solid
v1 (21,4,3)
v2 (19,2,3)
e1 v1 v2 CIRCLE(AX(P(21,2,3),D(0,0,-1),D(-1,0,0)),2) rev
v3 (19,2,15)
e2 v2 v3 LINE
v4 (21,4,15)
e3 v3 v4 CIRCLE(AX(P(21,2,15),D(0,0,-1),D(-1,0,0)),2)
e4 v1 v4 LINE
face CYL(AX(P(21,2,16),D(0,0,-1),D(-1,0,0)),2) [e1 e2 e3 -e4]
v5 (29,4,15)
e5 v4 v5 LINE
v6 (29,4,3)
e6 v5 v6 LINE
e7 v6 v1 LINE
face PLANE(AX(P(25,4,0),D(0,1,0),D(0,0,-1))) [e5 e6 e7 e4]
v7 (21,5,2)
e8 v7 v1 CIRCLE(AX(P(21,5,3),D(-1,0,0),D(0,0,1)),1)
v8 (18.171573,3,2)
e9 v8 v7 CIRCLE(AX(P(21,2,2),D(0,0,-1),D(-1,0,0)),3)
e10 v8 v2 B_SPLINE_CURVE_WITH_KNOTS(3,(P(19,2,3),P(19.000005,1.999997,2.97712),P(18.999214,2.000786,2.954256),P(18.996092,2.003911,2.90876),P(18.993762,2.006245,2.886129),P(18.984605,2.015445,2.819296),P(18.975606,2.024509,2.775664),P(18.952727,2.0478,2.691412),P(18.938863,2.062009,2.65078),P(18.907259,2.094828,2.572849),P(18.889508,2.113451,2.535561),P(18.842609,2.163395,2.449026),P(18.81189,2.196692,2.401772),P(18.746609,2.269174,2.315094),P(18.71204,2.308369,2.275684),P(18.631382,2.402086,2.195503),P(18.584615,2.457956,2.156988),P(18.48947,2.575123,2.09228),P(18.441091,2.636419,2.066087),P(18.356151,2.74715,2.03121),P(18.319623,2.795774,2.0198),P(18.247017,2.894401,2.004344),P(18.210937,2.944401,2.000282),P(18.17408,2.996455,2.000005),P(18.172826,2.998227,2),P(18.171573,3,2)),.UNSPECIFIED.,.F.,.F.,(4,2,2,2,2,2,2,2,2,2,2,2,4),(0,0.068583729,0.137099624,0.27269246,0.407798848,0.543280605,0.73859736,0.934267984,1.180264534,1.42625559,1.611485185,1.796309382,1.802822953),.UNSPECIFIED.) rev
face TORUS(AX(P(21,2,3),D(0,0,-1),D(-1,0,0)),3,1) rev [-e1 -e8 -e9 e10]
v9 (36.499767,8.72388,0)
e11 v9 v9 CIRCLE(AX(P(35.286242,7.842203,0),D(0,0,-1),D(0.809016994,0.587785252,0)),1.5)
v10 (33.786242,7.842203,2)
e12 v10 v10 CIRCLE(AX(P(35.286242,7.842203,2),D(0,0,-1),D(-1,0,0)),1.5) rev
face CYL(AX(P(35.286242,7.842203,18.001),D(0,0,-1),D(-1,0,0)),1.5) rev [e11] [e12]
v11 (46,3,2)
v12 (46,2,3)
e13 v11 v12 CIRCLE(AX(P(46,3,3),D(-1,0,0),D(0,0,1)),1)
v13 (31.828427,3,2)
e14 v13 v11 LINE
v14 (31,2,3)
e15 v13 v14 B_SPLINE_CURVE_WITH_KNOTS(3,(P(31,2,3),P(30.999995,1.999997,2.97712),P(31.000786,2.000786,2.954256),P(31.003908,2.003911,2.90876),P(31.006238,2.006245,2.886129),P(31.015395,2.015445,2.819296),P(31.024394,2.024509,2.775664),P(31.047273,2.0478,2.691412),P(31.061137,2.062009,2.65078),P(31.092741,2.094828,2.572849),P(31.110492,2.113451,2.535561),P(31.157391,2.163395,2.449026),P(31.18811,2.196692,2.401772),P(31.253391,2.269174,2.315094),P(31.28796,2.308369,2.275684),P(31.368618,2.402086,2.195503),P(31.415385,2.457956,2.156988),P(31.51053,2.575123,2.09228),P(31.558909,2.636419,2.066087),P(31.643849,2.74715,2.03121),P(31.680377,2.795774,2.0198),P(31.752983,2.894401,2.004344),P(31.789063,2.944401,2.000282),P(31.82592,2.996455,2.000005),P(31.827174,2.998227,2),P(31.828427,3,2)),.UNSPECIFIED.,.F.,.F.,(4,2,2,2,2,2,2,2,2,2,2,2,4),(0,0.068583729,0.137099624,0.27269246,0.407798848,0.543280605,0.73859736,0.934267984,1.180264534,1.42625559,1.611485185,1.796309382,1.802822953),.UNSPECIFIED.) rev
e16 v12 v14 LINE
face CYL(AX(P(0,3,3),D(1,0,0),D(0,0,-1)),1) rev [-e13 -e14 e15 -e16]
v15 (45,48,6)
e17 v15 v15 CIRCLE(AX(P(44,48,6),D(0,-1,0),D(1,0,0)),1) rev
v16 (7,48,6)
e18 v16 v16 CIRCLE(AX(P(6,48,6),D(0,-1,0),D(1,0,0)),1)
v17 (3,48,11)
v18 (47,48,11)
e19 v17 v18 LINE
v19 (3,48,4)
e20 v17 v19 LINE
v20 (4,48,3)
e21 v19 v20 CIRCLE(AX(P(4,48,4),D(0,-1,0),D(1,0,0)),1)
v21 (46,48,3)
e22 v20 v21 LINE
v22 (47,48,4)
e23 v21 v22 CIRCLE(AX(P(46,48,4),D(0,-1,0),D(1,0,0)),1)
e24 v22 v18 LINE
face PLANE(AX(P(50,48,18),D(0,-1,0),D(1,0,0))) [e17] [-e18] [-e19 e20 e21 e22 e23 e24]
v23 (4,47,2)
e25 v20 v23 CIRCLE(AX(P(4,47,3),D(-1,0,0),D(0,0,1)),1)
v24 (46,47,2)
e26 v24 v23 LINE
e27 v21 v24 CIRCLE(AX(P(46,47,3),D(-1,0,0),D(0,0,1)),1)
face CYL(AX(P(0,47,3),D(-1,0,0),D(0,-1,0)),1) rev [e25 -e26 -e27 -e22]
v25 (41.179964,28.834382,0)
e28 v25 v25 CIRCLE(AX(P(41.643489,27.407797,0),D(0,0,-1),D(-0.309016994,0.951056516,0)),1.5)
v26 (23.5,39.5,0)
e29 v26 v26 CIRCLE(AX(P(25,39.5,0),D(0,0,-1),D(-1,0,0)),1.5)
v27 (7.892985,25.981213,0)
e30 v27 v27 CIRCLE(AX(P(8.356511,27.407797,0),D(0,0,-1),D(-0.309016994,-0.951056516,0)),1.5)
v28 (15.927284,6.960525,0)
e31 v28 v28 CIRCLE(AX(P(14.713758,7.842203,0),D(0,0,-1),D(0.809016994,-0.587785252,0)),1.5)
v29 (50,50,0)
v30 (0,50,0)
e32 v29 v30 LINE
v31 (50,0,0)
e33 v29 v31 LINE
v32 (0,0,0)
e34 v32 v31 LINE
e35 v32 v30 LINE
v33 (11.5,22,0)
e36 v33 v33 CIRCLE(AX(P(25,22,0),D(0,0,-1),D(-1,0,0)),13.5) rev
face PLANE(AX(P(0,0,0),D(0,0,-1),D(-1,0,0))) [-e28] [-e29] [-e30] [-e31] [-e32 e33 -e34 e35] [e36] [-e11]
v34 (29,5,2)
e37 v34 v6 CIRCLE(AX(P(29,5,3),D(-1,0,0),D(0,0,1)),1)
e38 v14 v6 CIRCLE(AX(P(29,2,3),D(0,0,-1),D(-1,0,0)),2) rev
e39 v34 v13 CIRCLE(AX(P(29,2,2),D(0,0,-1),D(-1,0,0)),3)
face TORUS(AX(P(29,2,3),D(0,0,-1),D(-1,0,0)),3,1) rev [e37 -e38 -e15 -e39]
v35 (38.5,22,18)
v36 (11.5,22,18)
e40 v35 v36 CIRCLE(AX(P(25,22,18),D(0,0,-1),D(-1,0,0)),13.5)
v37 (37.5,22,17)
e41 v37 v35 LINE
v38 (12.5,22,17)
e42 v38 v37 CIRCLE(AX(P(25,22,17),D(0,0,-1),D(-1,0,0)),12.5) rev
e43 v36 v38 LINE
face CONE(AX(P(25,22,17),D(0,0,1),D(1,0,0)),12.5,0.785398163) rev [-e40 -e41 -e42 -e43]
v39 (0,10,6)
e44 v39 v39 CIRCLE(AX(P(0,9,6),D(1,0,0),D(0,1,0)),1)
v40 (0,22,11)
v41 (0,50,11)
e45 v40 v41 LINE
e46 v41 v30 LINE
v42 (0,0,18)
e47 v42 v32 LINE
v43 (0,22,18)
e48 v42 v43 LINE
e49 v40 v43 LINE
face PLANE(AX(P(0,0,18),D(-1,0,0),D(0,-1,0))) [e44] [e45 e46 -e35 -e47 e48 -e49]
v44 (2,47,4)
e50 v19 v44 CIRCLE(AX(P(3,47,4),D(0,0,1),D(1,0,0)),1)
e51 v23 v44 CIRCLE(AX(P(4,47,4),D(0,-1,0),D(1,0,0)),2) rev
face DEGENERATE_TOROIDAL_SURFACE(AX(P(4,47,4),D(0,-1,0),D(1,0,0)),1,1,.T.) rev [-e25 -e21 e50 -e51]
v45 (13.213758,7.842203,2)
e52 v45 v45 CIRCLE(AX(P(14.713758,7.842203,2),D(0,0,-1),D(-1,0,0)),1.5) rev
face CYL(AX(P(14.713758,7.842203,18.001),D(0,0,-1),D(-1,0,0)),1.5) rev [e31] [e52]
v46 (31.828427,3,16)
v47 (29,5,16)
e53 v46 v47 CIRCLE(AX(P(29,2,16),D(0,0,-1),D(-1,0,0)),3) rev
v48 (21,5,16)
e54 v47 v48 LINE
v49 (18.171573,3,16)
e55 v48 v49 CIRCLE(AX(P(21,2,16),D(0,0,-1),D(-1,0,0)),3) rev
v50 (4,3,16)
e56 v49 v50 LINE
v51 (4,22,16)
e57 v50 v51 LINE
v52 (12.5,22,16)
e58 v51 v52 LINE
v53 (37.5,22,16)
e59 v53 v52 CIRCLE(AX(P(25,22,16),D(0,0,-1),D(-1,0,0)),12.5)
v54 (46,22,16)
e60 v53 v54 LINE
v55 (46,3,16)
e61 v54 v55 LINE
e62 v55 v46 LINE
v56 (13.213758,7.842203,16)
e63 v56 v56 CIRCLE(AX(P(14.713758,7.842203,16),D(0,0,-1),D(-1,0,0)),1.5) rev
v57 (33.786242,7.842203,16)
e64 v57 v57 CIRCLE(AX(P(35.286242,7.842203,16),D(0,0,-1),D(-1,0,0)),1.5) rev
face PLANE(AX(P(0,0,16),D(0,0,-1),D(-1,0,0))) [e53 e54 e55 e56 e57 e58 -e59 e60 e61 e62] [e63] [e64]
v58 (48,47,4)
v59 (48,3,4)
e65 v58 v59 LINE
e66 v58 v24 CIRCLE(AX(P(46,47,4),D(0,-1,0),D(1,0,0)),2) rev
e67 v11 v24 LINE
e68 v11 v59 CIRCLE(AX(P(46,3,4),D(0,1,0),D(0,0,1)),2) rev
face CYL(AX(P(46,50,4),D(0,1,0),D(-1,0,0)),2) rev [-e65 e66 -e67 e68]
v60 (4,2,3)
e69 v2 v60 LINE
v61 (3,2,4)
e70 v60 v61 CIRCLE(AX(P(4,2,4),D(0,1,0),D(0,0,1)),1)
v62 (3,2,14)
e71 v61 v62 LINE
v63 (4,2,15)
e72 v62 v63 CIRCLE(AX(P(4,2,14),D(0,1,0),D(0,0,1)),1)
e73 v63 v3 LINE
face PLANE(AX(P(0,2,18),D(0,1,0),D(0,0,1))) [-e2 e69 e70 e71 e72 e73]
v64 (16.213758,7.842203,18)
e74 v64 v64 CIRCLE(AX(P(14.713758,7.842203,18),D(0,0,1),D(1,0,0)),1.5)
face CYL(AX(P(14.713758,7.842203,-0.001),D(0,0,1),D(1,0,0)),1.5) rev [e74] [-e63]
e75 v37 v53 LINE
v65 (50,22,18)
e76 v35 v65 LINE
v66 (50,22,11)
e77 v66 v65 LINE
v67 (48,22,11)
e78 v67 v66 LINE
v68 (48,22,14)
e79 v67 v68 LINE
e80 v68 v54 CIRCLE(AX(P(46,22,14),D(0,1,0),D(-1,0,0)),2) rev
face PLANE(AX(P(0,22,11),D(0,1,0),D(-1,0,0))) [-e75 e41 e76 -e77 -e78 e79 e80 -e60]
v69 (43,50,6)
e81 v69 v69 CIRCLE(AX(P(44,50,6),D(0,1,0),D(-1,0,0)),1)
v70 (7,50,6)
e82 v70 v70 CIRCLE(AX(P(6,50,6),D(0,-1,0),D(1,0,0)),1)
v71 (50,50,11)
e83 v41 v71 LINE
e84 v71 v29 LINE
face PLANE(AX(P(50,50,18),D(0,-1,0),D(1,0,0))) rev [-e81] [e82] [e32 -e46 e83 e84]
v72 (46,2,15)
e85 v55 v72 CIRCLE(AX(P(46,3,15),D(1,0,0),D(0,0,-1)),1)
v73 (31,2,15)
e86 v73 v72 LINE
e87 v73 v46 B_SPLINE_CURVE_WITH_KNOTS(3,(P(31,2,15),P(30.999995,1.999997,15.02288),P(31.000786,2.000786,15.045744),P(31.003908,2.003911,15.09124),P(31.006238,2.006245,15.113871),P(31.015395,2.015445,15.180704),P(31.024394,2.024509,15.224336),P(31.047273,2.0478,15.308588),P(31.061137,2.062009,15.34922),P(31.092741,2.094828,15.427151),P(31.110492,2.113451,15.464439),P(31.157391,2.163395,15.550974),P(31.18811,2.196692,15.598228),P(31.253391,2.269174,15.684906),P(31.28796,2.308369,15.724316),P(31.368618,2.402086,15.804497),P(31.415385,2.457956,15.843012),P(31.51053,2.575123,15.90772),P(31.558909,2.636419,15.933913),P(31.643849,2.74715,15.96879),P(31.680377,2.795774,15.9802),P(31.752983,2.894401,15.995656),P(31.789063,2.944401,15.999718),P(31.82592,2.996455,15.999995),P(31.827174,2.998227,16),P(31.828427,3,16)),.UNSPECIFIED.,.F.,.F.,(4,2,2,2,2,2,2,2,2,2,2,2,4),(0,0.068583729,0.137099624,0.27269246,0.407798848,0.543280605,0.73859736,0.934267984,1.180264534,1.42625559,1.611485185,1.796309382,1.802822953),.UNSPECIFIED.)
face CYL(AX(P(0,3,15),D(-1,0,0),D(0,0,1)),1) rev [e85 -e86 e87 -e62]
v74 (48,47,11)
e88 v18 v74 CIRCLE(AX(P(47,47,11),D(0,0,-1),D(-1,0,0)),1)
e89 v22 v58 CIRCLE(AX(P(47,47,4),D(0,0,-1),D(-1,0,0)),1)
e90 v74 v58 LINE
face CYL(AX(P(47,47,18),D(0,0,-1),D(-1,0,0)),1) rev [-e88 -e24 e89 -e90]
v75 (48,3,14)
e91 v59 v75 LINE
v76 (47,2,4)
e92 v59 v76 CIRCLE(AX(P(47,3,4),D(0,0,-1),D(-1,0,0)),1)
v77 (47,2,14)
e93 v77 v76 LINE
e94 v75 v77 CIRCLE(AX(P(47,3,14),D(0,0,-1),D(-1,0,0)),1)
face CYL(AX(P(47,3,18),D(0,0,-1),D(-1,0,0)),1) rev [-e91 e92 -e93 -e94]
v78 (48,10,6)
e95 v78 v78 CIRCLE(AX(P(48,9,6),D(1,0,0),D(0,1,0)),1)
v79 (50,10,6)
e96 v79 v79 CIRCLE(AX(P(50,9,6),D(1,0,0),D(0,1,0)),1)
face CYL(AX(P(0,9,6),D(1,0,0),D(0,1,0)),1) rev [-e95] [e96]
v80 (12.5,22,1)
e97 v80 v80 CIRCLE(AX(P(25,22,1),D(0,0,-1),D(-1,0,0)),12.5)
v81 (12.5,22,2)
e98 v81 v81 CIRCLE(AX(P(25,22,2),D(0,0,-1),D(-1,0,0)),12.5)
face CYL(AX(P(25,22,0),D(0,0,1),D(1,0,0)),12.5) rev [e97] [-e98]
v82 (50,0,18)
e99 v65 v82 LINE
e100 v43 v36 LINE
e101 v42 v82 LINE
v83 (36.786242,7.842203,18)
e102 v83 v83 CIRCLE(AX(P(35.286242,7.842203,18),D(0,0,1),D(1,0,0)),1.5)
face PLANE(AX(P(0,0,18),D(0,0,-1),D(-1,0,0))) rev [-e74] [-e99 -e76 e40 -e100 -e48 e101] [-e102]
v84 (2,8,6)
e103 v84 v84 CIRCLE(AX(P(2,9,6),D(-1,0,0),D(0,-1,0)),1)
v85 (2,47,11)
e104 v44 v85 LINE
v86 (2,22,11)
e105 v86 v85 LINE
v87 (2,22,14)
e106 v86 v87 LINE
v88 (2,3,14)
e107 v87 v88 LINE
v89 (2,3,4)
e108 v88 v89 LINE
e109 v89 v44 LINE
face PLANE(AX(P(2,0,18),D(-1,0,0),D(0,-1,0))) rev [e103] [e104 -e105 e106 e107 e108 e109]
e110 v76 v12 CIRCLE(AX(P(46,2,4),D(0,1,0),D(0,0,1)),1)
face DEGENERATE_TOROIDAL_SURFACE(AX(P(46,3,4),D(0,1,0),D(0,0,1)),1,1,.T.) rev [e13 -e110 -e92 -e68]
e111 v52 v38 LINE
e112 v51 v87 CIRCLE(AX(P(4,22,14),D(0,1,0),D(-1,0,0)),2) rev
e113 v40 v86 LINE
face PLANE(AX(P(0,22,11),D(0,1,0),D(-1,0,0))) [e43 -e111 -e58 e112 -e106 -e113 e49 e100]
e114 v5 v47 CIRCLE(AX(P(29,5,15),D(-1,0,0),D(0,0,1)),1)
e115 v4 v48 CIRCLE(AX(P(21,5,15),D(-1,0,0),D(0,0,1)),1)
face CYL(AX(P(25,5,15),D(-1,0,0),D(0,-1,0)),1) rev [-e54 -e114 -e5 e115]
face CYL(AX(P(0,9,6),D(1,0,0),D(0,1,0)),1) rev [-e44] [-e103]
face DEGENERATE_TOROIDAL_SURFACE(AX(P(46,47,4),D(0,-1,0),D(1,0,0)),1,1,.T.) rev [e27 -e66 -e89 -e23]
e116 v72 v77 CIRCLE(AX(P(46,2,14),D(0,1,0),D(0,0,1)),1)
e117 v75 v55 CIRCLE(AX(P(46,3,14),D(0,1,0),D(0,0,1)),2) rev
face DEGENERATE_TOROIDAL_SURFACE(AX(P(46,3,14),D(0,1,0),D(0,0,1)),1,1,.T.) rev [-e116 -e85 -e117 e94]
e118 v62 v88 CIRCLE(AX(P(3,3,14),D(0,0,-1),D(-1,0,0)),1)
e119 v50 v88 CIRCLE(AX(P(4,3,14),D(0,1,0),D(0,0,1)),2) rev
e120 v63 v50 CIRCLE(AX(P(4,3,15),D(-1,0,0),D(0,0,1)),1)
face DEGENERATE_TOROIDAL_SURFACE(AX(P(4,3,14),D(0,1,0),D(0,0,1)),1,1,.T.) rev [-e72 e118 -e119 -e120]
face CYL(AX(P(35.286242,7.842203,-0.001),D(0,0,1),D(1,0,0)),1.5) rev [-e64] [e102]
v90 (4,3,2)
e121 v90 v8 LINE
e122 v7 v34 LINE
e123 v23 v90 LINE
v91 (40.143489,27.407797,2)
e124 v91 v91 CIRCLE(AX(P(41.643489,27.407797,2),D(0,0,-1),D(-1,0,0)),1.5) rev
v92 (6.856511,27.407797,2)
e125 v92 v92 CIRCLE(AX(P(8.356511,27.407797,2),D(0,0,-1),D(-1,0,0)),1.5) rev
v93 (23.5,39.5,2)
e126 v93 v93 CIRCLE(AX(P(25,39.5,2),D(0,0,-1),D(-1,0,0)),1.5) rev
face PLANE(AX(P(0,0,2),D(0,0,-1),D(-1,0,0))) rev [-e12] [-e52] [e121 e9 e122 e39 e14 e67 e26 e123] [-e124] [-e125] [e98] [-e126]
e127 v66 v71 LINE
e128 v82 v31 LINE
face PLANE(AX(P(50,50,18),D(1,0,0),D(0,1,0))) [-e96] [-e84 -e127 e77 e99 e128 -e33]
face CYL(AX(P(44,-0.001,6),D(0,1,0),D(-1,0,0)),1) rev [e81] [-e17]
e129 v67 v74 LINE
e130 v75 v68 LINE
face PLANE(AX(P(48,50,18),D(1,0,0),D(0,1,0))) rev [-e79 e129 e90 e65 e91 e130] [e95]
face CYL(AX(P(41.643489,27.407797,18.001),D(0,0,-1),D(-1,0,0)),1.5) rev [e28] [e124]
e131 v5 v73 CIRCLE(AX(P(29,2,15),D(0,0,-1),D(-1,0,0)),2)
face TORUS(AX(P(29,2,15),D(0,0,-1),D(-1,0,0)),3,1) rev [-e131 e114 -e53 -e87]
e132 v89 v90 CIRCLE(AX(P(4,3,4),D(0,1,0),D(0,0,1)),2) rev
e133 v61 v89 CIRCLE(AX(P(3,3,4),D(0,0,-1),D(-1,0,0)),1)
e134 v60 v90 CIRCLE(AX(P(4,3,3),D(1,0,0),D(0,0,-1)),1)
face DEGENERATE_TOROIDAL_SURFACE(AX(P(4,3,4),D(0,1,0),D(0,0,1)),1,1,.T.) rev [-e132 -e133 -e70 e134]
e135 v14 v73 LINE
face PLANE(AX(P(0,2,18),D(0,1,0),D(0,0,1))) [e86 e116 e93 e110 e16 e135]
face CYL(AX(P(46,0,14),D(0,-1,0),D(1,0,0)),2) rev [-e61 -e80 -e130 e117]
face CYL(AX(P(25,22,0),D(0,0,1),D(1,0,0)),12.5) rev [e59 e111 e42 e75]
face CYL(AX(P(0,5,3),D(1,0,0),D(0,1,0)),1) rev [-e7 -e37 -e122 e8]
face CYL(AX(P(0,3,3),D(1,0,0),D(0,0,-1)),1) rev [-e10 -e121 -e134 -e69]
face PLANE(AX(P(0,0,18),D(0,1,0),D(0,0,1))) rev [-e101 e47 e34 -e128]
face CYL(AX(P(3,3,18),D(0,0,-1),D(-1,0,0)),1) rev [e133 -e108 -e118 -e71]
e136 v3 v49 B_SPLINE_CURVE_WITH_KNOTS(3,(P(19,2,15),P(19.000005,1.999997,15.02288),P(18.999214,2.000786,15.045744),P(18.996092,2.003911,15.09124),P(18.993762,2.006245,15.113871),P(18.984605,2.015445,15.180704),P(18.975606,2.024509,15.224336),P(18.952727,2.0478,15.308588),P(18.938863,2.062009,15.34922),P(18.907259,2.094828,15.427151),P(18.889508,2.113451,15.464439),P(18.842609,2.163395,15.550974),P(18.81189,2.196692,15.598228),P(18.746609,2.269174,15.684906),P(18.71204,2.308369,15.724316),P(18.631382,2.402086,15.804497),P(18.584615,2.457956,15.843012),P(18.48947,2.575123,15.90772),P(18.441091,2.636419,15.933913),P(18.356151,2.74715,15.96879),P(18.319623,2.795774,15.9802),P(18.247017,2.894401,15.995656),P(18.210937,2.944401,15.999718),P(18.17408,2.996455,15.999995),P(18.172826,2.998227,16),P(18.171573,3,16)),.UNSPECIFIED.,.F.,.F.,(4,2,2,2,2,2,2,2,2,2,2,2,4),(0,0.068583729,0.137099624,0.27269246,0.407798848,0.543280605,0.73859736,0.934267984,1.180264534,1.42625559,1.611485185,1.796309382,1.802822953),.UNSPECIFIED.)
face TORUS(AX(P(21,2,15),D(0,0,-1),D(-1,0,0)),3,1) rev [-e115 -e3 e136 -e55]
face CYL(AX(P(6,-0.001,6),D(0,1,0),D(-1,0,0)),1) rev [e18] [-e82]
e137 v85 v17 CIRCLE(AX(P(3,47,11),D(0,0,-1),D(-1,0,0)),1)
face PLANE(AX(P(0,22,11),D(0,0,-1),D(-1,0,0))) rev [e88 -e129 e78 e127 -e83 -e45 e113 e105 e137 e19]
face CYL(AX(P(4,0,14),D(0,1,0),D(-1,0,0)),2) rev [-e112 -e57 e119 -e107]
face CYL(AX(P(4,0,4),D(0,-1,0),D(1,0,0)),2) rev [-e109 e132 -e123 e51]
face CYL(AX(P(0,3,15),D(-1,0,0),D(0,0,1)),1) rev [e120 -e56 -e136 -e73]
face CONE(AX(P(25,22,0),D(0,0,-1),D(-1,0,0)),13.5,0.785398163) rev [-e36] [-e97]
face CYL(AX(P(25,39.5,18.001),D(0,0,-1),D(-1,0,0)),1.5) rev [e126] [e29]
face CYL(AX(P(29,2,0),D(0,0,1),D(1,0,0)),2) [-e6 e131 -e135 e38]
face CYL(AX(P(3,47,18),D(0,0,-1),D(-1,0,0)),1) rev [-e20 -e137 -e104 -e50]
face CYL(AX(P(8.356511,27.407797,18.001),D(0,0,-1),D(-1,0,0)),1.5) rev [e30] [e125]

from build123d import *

# Parameters (mm, degrees)
SKETCH1_W          = 50
SKETCH1_H          = 50
MAIN_DEPTH         = 18
SKETCH2_W          = 7
SKETCH2_H          = 28
CUT_EXTRUDE1_DEPTH = 73.965745388
SHELL1_T           = -2
RIB1_REACH         = 72.285
SKETCH11_WALLS_W   = 12
SKETCH11_WALLS_H   = 158.570267126
SKETCH3_R          = 12.5
CUT_EXTRUDE2_DEPTH = 73.965745388
CHAMFER1_SIZE      = 1
CUT_EXTRUDE3_REACH = 74.966
SKETCH4_R          = 1
SKETCH6_R          = 1
CUT_EXTRUDE4_DEPTH = 73.965745388
CUT_EXTRUDE7_REACH = 74.966
SKETCH9_R          = 1.5
CIRPATTERN1_COUNT  = 5
CUT_EXTRUDE8_REACH = 74.966
SKETCH13_R         = 1.5
FILLET1_R          = 2
FILLET2_R          = 2
FILLET3_R          = 1


# Some blends are built 0.0001 mm under size
with BuildPart() as part:
    # Sketch1 → main (new body)
    with BuildSketch(Plane.XY):
        with Locations((25, 25)):
            Rectangle(SKETCH1_W, SKETCH1_H)
    extrude(amount=MAIN_DEPTH)

    # Sketch2 → Cut-Extrude1 (cut, through all)
    with BuildSketch(Plane(origin=(50, 0, 0), x_dir=(0, 0, -1), z_dir=(1, 0, 0))):
        with Locations((-14.5, 36)):
            Rectangle(SKETCH2_W, SKETCH2_H)
    extrude(amount=-CUT_EXTRUDE1_DEPTH, mode=Mode.SUBTRACT)

    # Shell1
    shell1_openings = [part.faces().sort_by_distance(p)[0] for p in [
        (25, 36, 11),
        (25, 22, 14.5),
    ]]
    offset(amount=SHELL1_T, openings=shell1_openings, kind=Kind.INTERSECTION)

    # Sketch11 walls → Rib1 (add, up to next)
    with BuildSketch(Plane(origin=(0, 4, 0), x_dir=(-1, 0, 0), z_dir=(0, 1, 0)), mode=Mode.PRIVATE) as rib1_sk1:
        with Locations((-25, 8)):
            Rectangle(SKETCH11_WALLS_W, SKETCH11_WALLS_H)
    rib1_tool1 = extrude(rib1_sk1.sketch, amount=-RIB1_REACH, mode=Mode.PRIVATE) - part.part
    add(rib1_tool1.solids().sort_by_distance((25, 4, 8))[0])

    # Sketch3 → Cut-Extrude2 (cut, through all)
    with BuildSketch(Plane.XY.offset(18)):
        with Locations((25, 22)):
            Circle(SKETCH3_R)
    extrude(amount=-CUT_EXTRUDE2_DEPTH, mode=Mode.SUBTRACT)

    # Chamfer1
    chamfer1_edges = [part.edges().sort_by_distance(p)[0] for p in [
        (12.5, 22, 0),
        (25, 9.5, 18),
    ]]
    chamfer(chamfer1_edges, length=CHAMFER1_SIZE)

    # Sketch4 → Cut-Extrude3 (cut, up to next)
    with BuildSketch(Plane(origin=(0, 50, 0), x_dir=(-1, 0, 0), z_dir=(0, 1, 0)), mode=Mode.PRIVATE) as cut_extrude3_sk1:
        with Locations((-44, 6)):
            Circle(SKETCH4_R)
    cut_extrude3_tool1 = extrude(cut_extrude3_sk1.sketch, amount=-CUT_EXTRUDE3_REACH, mode=Mode.PRIVATE) & part.part
    # Sketch4 → Cut-Extrude3 (cut, up to next)
    with BuildSketch(Plane(origin=(0, 50, 0), x_dir=(-1, 0, 0), z_dir=(0, 1, 0)), mode=Mode.PRIVATE) as cut_extrude3_sk2:
        with Locations(Location((-6, 6, 0), (0, 0, 180))):
            Circle(SKETCH4_R)
    cut_extrude3_tool2 = extrude(cut_extrude3_sk2.sketch, amount=-CUT_EXTRUDE3_REACH, mode=Mode.PRIVATE) & part.part
    add(cut_extrude3_tool1.solids().sort_by_distance((44, 50, 6))[0], mode=Mode.SUBTRACT)
    add(cut_extrude3_tool2.solids().sort_by_distance((6, 50, 6))[0], mode=Mode.SUBTRACT)

    # Sketch6 → Cut-Extrude4 (cut, through all)
    with BuildSketch(Plane(origin=(50, 0, 0), x_dir=(0, 0, -1), z_dir=(1, 0, 0))):
        with Locations(Location((-6, 9, 0), (0, 0, 90))):
            Circle(SKETCH6_R)
    extrude(amount=-CUT_EXTRUDE4_DEPTH, mode=Mode.SUBTRACT)

    # Sketch9 → Cut-Extrude7 (cut, up to next)
    with BuildSketch(Plane(origin=(0, 0, 0), x_dir=(-1, 0, 0), z_dir=(0, 0, -1)), mode=Mode.PRIVATE) as cut_extrude7_sk1:
        with Locations((-25, 39.5)):
            Circle(SKETCH9_R)
    cut_extrude7_tool1 = extrude(cut_extrude7_sk1.sketch, amount=-CUT_EXTRUDE7_REACH, mode=Mode.PRIVATE) & part.part
    cut_extrude7 = cut_extrude7_tool1.solids().sort_by_distance((25, 39.5, 0))[0]
    add(cut_extrude7, mode=Mode.SUBTRACT)

    # CirPattern1: Cut-Extrude7 ×5 about axis
    cirpattern1_axis = Axis((25, 22, 0), (0, 0, 1))
    for i in range(1, CIRPATTERN1_COUNT):
        add(cut_extrude7.rotate(cirpattern1_axis, i * 360 / CIRPATTERN1_COUNT), mode=Mode.SUBTRACT)

    # Sketch13 → Cut-Extrude8 (cut, up to next)
    with BuildSketch(Plane.XY.offset(18), mode=Mode.PRIVATE) as cut_extrude8_sk1:
        with Locations(Location((35.286241915, 7.842202598, 0), (0, 0, 180))):
            Circle(SKETCH13_R)
    cut_extrude8_tool1 = extrude(cut_extrude8_sk1.sketch, amount=-CUT_EXTRUDE8_REACH, mode=Mode.PRIVATE) & part.part
    # Sketch13 → Cut-Extrude8 (cut, up to next)
    with BuildSketch(Plane.XY.offset(18), mode=Mode.PRIVATE) as cut_extrude8_sk2:
        with Locations(Location((14.713758085, 7.842202598, 0), (0, 0, 180))):
            Circle(SKETCH13_R)
    cut_extrude8_tool2 = extrude(cut_extrude8_sk2.sketch, amount=-CUT_EXTRUDE8_REACH, mode=Mode.PRIVATE) & part.part
    add(cut_extrude8_tool1.solids().sort_by_distance((35.286242, 7.842203, 18))[0], mode=Mode.SUBTRACT)
    add(cut_extrude8_tool2.solids().sort_by_distance((14.713758, 7.842203, 18))[0], mode=Mode.SUBTRACT)

    # Fillet1
    fillet1_edges = [part.edges().sort_by_distance(p)[0] for p in [
        (2, 12, 16),
        (48, 12, 16),
        (2, 25, 2),
        (48, 25, 2),
    ]]
    fillet(fillet1_edges, radius=FILLET1_R)

    # Fillet2
    fillet2_edges = [part.edges().sort_by_distance(p)[0] for p in [
        (31, 4, 9),
        (19, 4, 9),
    ]]
    fillet(fillet2_edges, radius=FILLET2_R - 0.0001)  # a hair under: the kernel refuses the full size

    # Fillet3
    # the kernel refuses this fillet: 1 mm, written as the material it adds along each edge
    with BuildSketch(Plane(origin=(48, 2, 4), x_dir=(-1, 0, 0), z_dir=(0, 0, 1)), Plane(origin=(2, 2, 14), x_dir=(1, 0, 0), z_dir=(0, 0, -1))) as fillet3_piece_1:
        with BuildLine():
            CenterArc((FILLET3_R, -FILLET3_R), FILLET3_R, 90, 90)
            Line((0, -FILLET3_R), (0, 0))
            Line((0, 0), (FILLET3_R, 0))
        make_face()
    extrude(amount=10)
    with BuildSketch(Plane(origin=(46, 2, 14), x_dir=(1, 0, 0), z_dir=(0, 0, -1))) as fillet3_piece_2:
        with BuildLine():
            CenterArc((2 - FILLET3_R, -FILLET3_R), FILLET3_R, 360, 90)
            Line((2, -FILLET3_R), (2, 0))
            Line((2, 0), (2 - FILLET3_R, 0))
        make_face()
    revolve(axis=Axis((46, 2, 14), (0, -1, 0)), revolution_arc=90)
    with BuildSketch(Plane(origin=(46, 2, 4), x_dir=(0, 0, -1), z_dir=(-1, 0, 0))) as fillet3_piece_3:
        with BuildLine():
            CenterArc((2 - FILLET3_R, -FILLET3_R), FILLET3_R, 0, 90)
            Line((2, -FILLET3_R), (2, 0))
            Line((2, 0), (2 - FILLET3_R, 0))
        make_face()
    revolve(axis=Axis((46, 2, 4), (0, -1, 0)), revolution_arc=90)
    with BuildSketch(Plane(origin=(4, 2, 2), x_dir=(0, 0, 1), z_dir=(1, 0, 0)), Plane(origin=(4, 2, 16), x_dir=(0, 1, 0), z_dir=(1, 0, 0)), Plane(origin=(28.5, 2, 2), x_dir=(0, 0, 1), z_dir=(1, 0, 0)), Plane(origin=(28.5, 2, 16), x_dir=(0, 1, 0), z_dir=(1, 0, 0))) as fillet3_piece_4:
        with BuildLine():
            CenterArc((FILLET3_R, -FILLET3_R), FILLET3_R, 90, 90)
            Line((0, -FILLET3_R), (0, 0))
            Line((0, 0), (FILLET3_R, 0))
        make_face()
    extrude(amount=17.5)
    with BuildSketch(Plane(origin=(4, 48, 2), x_dir=(0, -1, 0), z_dir=(1, 0, 0))) as fillet3_piece_5:
        with BuildLine():
            CenterArc((FILLET3_R, -FILLET3_R), FILLET3_R, 90, 90)
            Line((0, -FILLET3_R), (0, 0))
            Line((0, 0), (FILLET3_R, 0))
        make_face()
    extrude(amount=42)
    with BuildSketch(Plane(origin=(4, 48, 4), x_dir=(0, 0, -1), z_dir=(1, 0, 0))) as fillet3_piece_6:
        with BuildLine():
            CenterArc((2 - FILLET3_R, -FILLET3_R), FILLET3_R, 0, 90)
            Line((2 - FILLET3_R, 0), (2, 0))
            Line((2, 0), (2, -FILLET3_R))
        make_face()
    revolve(axis=Axis((4, 48, 4), (0, 1, 0)), revolution_arc=90)
    with BuildSketch(Plane(origin=(46, 48, 4), x_dir=(0, 0, -1), z_dir=(-1, 0, 0))) as fillet3_piece_7:
        with BuildLine():
            CenterArc((2 - FILLET3_R, FILLET3_R), FILLET3_R, 270, 90)
            Line((2 - FILLET3_R, 0), (2, 0))
            Line((2, 0), (2, FILLET3_R))
        make_face()
    revolve(axis=Axis((46, 48, 4), (0, -1, 0)), revolution_arc=90)
    with BuildSketch(Plane(origin=(4, 2, 4), x_dir=(0, 0, -1), z_dir=(1, 0, 0))) as fillet3_piece_8:
        with BuildLine():
            CenterArc((2 - FILLET3_R, FILLET3_R), FILLET3_R, 270, 90)
            Line((2, FILLET3_R), (2, 0))
            Line((2, 0), (2 - FILLET3_R, 0))
        make_face()
    revolve(axis=Axis((4, 2, 4), (0, 1, 0)), revolution_arc=90)
    with BuildSketch(Plane(origin=(4, 2, 14), x_dir=(-1, 0, 0), z_dir=(0, 0, -1))) as fillet3_piece_9:
        with BuildLine():
            CenterArc((2 - FILLET3_R, FILLET3_R), FILLET3_R, 270, 90)
            Line((2, FILLET3_R), (2, 0))
            Line((2, 0), (2 - FILLET3_R, 0))
        make_face()
    revolve(axis=Axis((4, 2, 14), (0, 1, 0)), revolution_arc=90)
    with BuildSketch(Plane(origin=(20.9999, 4, 16), x_dir=(0, 1, 0), z_dir=(1, 0, 0)), Plane(origin=(20.9999, 4, 2), x_dir=(0, 0, 1), z_dir=(1, 0, 0))) as fillet3_piece_10:
        with BuildLine():
            CenterArc((FILLET3_R, -FILLET3_R), FILLET3_R, 90, 90)
            Line((0, -FILLET3_R), (0, 0))
            Line((0, 0), (FILLET3_R, 0))
        make_face()
    extrude(amount=8.0002)
    with BuildSketch(Plane(origin=(29.0001, 2.0001, 2), x_dir=(1, 0, 0), z_dir=(0, -1, 0))) as fillet3_piece_11:
        with BuildLine():
            CenterArc((1.9999 + FILLET3_R, FILLET3_R), FILLET3_R, 180, 90)
            Line((1.9999 + FILLET3_R, 0), (1.9999, 0))
            Line((1.9999, 0), (1.9999, FILLET3_R))
        make_face()
    revolve(axis=Axis((29.0001, 2.0001, 2), (0, 0, 1)), revolution_arc=90)
    with BuildSketch(Plane(origin=(29.0001, 2.0001, 16), x_dir=(1, 0, 0), z_dir=(0, -1, 0))) as fillet3_piece_12:
        with BuildLine():
            CenterArc((1.9999 + FILLET3_R, -FILLET3_R), FILLET3_R, 90, 90)
            Line((1.9999, -FILLET3_R), (1.9999, 0))
            Line((1.9999, 0), (1.9999 + FILLET3_R, 0))
        make_face()
    revolve(axis=Axis((29.0001, 2.0001, 16), (0, 0, 1)), revolution_arc=90)
    with BuildSketch(Plane(origin=(20.9999, 2.0001, 2), x_dir=(0, 1, 0), z_dir=(1, 0, 0))) as fillet3_piece_13:
        with BuildLine():
            CenterArc((1.9999 + FILLET3_R, FILLET3_R), FILLET3_R, 180, 90)
            Line((1.9999 + FILLET3_R, 0), (1.9999, 0))
            Line((1.9999, 0), (1.9999, FILLET3_R))
        make_face()
    revolve(axis=Axis((20.9999, 2.0001, 2), (0, 0, 1)), revolution_arc=90)
    with BuildSketch(Plane(origin=(20.9999, 2.0001, 16), x_dir=(0, 1, 0), z_dir=(1, 0, 0))) as fillet3_piece_14:
        with BuildLine():
            CenterArc((1.9999 + FILLET3_R, -FILLET3_R), FILLET3_R, 90, 90)
            Line((1.9999, -FILLET3_R), (1.9999, 0))
            Line((1.9999, 0), (1.9999 + FILLET3_R, 0))
        make_face()
    revolve(axis=Axis((20.9999, 2.0001, 16), (0, 0, 1)), revolution_arc=90)
    with BuildSketch(Plane(origin=(2, 48, 11), x_dir=(0, -1, 0), z_dir=(0, 0, -1)), Plane(origin=(48, 48, 4), x_dir=(0, -1, 0), z_dir=(0, 0, 1))) as fillet3_piece_15:
        with BuildLine():
            CenterArc((FILLET3_R, -FILLET3_R), FILLET3_R, 90, 90)
            Line((0, -FILLET3_R), (0, 0))
            Line((0, 0), (FILLET3_R, 0))
        make_face()
    extrude(amount=7)
    with BuildSketch(Plane(origin=(19, -0.5, 16), x_dir=(-1, 0, 0), z_dir=(0, 1, 0))) as fillet3_piece_16_section:
        with BuildLine():
            CenterArc((FILLET3_R, -FILLET3_R), FILLET3_R, 90, 90)
            Line((0, -FILLET3_R), (0, 0))
            Line((0, 0), (FILLET3_R, 0))
        make_face()
    fillet3_piece_16 = extrude(amount=2.5001, mode=Mode.PRIVATE)
    fillet3_piece_16 = split(fillet3_piece_16, bisect_by=Plane(origin=(18.776632061, 0, 15.776632061), z_dir=(0, 1, 0)), keep=Keep.TOP, mode=Mode.PRIVATE)
    add(fillet3_piece_16)
    with BuildSketch(Plane(origin=(19, -0.5, 2), x_dir=(0, 0, 1), z_dir=(0, 1, 0))) as fillet3_piece_17_section:
        with BuildLine():
            CenterArc((FILLET3_R, -FILLET3_R), FILLET3_R, 90, 90)
            Line((0, -FILLET3_R), (0, 0))
            Line((0, 0), (FILLET3_R, 0))
        make_face()
    fillet3_piece_17 = extrude(amount=2.5001, mode=Mode.PRIVATE)
    fillet3_piece_17 = split(fillet3_piece_17, bisect_by=Plane(origin=(18.776632061, 0, 2.223367939), z_dir=(0, 1, 0)), keep=Keep.TOP, mode=Mode.PRIVATE)
    add(fillet3_piece_17)
    with BuildSketch(Plane(origin=(31, 2.0001, 16), x_dir=(1, 0, 0), z_dir=(0, -1, 0))) as fillet3_piece_18_section:
        with BuildLine():
            CenterArc((FILLET3_R, -FILLET3_R), FILLET3_R, 90, 90)
            Line((0, -FILLET3_R), (0, 0))
            Line((0, 0), (FILLET3_R, 0))
        make_face()
    fillet3_piece_18 = extrude(amount=2.5001, mode=Mode.PRIVATE)
    fillet3_piece_18 = split(fillet3_piece_18, bisect_by=Plane(origin=(31.223367939, 0, 15.776632061), z_dir=(0, 1, 0)), keep=Keep.TOP, mode=Mode.PRIVATE)
    add(fillet3_piece_18)
    with BuildSketch(Plane(origin=(31, 2.0001, 2), x_dir=(0, 0, 1), z_dir=(0, -1, 0))) as fillet3_piece_19_section:
        with BuildLine():
            CenterArc((FILLET3_R, -FILLET3_R), FILLET3_R, 90, 90)
            Line((0, -FILLET3_R), (0, 0))
            Line((0, 0), (FILLET3_R, 0))
        make_face()
    fillet3_piece_19 = extrude(amount=2.5001, mode=Mode.PRIVATE)
    fillet3_piece_19 = split(fillet3_piece_19, bisect_by=Plane(origin=(31.223367939, 0, 2.223367939), z_dir=(0, 1, 0)), keep=Keep.TOP, mode=Mode.PRIVATE)
    add(fillet3_piece_19)


solid = part.part
